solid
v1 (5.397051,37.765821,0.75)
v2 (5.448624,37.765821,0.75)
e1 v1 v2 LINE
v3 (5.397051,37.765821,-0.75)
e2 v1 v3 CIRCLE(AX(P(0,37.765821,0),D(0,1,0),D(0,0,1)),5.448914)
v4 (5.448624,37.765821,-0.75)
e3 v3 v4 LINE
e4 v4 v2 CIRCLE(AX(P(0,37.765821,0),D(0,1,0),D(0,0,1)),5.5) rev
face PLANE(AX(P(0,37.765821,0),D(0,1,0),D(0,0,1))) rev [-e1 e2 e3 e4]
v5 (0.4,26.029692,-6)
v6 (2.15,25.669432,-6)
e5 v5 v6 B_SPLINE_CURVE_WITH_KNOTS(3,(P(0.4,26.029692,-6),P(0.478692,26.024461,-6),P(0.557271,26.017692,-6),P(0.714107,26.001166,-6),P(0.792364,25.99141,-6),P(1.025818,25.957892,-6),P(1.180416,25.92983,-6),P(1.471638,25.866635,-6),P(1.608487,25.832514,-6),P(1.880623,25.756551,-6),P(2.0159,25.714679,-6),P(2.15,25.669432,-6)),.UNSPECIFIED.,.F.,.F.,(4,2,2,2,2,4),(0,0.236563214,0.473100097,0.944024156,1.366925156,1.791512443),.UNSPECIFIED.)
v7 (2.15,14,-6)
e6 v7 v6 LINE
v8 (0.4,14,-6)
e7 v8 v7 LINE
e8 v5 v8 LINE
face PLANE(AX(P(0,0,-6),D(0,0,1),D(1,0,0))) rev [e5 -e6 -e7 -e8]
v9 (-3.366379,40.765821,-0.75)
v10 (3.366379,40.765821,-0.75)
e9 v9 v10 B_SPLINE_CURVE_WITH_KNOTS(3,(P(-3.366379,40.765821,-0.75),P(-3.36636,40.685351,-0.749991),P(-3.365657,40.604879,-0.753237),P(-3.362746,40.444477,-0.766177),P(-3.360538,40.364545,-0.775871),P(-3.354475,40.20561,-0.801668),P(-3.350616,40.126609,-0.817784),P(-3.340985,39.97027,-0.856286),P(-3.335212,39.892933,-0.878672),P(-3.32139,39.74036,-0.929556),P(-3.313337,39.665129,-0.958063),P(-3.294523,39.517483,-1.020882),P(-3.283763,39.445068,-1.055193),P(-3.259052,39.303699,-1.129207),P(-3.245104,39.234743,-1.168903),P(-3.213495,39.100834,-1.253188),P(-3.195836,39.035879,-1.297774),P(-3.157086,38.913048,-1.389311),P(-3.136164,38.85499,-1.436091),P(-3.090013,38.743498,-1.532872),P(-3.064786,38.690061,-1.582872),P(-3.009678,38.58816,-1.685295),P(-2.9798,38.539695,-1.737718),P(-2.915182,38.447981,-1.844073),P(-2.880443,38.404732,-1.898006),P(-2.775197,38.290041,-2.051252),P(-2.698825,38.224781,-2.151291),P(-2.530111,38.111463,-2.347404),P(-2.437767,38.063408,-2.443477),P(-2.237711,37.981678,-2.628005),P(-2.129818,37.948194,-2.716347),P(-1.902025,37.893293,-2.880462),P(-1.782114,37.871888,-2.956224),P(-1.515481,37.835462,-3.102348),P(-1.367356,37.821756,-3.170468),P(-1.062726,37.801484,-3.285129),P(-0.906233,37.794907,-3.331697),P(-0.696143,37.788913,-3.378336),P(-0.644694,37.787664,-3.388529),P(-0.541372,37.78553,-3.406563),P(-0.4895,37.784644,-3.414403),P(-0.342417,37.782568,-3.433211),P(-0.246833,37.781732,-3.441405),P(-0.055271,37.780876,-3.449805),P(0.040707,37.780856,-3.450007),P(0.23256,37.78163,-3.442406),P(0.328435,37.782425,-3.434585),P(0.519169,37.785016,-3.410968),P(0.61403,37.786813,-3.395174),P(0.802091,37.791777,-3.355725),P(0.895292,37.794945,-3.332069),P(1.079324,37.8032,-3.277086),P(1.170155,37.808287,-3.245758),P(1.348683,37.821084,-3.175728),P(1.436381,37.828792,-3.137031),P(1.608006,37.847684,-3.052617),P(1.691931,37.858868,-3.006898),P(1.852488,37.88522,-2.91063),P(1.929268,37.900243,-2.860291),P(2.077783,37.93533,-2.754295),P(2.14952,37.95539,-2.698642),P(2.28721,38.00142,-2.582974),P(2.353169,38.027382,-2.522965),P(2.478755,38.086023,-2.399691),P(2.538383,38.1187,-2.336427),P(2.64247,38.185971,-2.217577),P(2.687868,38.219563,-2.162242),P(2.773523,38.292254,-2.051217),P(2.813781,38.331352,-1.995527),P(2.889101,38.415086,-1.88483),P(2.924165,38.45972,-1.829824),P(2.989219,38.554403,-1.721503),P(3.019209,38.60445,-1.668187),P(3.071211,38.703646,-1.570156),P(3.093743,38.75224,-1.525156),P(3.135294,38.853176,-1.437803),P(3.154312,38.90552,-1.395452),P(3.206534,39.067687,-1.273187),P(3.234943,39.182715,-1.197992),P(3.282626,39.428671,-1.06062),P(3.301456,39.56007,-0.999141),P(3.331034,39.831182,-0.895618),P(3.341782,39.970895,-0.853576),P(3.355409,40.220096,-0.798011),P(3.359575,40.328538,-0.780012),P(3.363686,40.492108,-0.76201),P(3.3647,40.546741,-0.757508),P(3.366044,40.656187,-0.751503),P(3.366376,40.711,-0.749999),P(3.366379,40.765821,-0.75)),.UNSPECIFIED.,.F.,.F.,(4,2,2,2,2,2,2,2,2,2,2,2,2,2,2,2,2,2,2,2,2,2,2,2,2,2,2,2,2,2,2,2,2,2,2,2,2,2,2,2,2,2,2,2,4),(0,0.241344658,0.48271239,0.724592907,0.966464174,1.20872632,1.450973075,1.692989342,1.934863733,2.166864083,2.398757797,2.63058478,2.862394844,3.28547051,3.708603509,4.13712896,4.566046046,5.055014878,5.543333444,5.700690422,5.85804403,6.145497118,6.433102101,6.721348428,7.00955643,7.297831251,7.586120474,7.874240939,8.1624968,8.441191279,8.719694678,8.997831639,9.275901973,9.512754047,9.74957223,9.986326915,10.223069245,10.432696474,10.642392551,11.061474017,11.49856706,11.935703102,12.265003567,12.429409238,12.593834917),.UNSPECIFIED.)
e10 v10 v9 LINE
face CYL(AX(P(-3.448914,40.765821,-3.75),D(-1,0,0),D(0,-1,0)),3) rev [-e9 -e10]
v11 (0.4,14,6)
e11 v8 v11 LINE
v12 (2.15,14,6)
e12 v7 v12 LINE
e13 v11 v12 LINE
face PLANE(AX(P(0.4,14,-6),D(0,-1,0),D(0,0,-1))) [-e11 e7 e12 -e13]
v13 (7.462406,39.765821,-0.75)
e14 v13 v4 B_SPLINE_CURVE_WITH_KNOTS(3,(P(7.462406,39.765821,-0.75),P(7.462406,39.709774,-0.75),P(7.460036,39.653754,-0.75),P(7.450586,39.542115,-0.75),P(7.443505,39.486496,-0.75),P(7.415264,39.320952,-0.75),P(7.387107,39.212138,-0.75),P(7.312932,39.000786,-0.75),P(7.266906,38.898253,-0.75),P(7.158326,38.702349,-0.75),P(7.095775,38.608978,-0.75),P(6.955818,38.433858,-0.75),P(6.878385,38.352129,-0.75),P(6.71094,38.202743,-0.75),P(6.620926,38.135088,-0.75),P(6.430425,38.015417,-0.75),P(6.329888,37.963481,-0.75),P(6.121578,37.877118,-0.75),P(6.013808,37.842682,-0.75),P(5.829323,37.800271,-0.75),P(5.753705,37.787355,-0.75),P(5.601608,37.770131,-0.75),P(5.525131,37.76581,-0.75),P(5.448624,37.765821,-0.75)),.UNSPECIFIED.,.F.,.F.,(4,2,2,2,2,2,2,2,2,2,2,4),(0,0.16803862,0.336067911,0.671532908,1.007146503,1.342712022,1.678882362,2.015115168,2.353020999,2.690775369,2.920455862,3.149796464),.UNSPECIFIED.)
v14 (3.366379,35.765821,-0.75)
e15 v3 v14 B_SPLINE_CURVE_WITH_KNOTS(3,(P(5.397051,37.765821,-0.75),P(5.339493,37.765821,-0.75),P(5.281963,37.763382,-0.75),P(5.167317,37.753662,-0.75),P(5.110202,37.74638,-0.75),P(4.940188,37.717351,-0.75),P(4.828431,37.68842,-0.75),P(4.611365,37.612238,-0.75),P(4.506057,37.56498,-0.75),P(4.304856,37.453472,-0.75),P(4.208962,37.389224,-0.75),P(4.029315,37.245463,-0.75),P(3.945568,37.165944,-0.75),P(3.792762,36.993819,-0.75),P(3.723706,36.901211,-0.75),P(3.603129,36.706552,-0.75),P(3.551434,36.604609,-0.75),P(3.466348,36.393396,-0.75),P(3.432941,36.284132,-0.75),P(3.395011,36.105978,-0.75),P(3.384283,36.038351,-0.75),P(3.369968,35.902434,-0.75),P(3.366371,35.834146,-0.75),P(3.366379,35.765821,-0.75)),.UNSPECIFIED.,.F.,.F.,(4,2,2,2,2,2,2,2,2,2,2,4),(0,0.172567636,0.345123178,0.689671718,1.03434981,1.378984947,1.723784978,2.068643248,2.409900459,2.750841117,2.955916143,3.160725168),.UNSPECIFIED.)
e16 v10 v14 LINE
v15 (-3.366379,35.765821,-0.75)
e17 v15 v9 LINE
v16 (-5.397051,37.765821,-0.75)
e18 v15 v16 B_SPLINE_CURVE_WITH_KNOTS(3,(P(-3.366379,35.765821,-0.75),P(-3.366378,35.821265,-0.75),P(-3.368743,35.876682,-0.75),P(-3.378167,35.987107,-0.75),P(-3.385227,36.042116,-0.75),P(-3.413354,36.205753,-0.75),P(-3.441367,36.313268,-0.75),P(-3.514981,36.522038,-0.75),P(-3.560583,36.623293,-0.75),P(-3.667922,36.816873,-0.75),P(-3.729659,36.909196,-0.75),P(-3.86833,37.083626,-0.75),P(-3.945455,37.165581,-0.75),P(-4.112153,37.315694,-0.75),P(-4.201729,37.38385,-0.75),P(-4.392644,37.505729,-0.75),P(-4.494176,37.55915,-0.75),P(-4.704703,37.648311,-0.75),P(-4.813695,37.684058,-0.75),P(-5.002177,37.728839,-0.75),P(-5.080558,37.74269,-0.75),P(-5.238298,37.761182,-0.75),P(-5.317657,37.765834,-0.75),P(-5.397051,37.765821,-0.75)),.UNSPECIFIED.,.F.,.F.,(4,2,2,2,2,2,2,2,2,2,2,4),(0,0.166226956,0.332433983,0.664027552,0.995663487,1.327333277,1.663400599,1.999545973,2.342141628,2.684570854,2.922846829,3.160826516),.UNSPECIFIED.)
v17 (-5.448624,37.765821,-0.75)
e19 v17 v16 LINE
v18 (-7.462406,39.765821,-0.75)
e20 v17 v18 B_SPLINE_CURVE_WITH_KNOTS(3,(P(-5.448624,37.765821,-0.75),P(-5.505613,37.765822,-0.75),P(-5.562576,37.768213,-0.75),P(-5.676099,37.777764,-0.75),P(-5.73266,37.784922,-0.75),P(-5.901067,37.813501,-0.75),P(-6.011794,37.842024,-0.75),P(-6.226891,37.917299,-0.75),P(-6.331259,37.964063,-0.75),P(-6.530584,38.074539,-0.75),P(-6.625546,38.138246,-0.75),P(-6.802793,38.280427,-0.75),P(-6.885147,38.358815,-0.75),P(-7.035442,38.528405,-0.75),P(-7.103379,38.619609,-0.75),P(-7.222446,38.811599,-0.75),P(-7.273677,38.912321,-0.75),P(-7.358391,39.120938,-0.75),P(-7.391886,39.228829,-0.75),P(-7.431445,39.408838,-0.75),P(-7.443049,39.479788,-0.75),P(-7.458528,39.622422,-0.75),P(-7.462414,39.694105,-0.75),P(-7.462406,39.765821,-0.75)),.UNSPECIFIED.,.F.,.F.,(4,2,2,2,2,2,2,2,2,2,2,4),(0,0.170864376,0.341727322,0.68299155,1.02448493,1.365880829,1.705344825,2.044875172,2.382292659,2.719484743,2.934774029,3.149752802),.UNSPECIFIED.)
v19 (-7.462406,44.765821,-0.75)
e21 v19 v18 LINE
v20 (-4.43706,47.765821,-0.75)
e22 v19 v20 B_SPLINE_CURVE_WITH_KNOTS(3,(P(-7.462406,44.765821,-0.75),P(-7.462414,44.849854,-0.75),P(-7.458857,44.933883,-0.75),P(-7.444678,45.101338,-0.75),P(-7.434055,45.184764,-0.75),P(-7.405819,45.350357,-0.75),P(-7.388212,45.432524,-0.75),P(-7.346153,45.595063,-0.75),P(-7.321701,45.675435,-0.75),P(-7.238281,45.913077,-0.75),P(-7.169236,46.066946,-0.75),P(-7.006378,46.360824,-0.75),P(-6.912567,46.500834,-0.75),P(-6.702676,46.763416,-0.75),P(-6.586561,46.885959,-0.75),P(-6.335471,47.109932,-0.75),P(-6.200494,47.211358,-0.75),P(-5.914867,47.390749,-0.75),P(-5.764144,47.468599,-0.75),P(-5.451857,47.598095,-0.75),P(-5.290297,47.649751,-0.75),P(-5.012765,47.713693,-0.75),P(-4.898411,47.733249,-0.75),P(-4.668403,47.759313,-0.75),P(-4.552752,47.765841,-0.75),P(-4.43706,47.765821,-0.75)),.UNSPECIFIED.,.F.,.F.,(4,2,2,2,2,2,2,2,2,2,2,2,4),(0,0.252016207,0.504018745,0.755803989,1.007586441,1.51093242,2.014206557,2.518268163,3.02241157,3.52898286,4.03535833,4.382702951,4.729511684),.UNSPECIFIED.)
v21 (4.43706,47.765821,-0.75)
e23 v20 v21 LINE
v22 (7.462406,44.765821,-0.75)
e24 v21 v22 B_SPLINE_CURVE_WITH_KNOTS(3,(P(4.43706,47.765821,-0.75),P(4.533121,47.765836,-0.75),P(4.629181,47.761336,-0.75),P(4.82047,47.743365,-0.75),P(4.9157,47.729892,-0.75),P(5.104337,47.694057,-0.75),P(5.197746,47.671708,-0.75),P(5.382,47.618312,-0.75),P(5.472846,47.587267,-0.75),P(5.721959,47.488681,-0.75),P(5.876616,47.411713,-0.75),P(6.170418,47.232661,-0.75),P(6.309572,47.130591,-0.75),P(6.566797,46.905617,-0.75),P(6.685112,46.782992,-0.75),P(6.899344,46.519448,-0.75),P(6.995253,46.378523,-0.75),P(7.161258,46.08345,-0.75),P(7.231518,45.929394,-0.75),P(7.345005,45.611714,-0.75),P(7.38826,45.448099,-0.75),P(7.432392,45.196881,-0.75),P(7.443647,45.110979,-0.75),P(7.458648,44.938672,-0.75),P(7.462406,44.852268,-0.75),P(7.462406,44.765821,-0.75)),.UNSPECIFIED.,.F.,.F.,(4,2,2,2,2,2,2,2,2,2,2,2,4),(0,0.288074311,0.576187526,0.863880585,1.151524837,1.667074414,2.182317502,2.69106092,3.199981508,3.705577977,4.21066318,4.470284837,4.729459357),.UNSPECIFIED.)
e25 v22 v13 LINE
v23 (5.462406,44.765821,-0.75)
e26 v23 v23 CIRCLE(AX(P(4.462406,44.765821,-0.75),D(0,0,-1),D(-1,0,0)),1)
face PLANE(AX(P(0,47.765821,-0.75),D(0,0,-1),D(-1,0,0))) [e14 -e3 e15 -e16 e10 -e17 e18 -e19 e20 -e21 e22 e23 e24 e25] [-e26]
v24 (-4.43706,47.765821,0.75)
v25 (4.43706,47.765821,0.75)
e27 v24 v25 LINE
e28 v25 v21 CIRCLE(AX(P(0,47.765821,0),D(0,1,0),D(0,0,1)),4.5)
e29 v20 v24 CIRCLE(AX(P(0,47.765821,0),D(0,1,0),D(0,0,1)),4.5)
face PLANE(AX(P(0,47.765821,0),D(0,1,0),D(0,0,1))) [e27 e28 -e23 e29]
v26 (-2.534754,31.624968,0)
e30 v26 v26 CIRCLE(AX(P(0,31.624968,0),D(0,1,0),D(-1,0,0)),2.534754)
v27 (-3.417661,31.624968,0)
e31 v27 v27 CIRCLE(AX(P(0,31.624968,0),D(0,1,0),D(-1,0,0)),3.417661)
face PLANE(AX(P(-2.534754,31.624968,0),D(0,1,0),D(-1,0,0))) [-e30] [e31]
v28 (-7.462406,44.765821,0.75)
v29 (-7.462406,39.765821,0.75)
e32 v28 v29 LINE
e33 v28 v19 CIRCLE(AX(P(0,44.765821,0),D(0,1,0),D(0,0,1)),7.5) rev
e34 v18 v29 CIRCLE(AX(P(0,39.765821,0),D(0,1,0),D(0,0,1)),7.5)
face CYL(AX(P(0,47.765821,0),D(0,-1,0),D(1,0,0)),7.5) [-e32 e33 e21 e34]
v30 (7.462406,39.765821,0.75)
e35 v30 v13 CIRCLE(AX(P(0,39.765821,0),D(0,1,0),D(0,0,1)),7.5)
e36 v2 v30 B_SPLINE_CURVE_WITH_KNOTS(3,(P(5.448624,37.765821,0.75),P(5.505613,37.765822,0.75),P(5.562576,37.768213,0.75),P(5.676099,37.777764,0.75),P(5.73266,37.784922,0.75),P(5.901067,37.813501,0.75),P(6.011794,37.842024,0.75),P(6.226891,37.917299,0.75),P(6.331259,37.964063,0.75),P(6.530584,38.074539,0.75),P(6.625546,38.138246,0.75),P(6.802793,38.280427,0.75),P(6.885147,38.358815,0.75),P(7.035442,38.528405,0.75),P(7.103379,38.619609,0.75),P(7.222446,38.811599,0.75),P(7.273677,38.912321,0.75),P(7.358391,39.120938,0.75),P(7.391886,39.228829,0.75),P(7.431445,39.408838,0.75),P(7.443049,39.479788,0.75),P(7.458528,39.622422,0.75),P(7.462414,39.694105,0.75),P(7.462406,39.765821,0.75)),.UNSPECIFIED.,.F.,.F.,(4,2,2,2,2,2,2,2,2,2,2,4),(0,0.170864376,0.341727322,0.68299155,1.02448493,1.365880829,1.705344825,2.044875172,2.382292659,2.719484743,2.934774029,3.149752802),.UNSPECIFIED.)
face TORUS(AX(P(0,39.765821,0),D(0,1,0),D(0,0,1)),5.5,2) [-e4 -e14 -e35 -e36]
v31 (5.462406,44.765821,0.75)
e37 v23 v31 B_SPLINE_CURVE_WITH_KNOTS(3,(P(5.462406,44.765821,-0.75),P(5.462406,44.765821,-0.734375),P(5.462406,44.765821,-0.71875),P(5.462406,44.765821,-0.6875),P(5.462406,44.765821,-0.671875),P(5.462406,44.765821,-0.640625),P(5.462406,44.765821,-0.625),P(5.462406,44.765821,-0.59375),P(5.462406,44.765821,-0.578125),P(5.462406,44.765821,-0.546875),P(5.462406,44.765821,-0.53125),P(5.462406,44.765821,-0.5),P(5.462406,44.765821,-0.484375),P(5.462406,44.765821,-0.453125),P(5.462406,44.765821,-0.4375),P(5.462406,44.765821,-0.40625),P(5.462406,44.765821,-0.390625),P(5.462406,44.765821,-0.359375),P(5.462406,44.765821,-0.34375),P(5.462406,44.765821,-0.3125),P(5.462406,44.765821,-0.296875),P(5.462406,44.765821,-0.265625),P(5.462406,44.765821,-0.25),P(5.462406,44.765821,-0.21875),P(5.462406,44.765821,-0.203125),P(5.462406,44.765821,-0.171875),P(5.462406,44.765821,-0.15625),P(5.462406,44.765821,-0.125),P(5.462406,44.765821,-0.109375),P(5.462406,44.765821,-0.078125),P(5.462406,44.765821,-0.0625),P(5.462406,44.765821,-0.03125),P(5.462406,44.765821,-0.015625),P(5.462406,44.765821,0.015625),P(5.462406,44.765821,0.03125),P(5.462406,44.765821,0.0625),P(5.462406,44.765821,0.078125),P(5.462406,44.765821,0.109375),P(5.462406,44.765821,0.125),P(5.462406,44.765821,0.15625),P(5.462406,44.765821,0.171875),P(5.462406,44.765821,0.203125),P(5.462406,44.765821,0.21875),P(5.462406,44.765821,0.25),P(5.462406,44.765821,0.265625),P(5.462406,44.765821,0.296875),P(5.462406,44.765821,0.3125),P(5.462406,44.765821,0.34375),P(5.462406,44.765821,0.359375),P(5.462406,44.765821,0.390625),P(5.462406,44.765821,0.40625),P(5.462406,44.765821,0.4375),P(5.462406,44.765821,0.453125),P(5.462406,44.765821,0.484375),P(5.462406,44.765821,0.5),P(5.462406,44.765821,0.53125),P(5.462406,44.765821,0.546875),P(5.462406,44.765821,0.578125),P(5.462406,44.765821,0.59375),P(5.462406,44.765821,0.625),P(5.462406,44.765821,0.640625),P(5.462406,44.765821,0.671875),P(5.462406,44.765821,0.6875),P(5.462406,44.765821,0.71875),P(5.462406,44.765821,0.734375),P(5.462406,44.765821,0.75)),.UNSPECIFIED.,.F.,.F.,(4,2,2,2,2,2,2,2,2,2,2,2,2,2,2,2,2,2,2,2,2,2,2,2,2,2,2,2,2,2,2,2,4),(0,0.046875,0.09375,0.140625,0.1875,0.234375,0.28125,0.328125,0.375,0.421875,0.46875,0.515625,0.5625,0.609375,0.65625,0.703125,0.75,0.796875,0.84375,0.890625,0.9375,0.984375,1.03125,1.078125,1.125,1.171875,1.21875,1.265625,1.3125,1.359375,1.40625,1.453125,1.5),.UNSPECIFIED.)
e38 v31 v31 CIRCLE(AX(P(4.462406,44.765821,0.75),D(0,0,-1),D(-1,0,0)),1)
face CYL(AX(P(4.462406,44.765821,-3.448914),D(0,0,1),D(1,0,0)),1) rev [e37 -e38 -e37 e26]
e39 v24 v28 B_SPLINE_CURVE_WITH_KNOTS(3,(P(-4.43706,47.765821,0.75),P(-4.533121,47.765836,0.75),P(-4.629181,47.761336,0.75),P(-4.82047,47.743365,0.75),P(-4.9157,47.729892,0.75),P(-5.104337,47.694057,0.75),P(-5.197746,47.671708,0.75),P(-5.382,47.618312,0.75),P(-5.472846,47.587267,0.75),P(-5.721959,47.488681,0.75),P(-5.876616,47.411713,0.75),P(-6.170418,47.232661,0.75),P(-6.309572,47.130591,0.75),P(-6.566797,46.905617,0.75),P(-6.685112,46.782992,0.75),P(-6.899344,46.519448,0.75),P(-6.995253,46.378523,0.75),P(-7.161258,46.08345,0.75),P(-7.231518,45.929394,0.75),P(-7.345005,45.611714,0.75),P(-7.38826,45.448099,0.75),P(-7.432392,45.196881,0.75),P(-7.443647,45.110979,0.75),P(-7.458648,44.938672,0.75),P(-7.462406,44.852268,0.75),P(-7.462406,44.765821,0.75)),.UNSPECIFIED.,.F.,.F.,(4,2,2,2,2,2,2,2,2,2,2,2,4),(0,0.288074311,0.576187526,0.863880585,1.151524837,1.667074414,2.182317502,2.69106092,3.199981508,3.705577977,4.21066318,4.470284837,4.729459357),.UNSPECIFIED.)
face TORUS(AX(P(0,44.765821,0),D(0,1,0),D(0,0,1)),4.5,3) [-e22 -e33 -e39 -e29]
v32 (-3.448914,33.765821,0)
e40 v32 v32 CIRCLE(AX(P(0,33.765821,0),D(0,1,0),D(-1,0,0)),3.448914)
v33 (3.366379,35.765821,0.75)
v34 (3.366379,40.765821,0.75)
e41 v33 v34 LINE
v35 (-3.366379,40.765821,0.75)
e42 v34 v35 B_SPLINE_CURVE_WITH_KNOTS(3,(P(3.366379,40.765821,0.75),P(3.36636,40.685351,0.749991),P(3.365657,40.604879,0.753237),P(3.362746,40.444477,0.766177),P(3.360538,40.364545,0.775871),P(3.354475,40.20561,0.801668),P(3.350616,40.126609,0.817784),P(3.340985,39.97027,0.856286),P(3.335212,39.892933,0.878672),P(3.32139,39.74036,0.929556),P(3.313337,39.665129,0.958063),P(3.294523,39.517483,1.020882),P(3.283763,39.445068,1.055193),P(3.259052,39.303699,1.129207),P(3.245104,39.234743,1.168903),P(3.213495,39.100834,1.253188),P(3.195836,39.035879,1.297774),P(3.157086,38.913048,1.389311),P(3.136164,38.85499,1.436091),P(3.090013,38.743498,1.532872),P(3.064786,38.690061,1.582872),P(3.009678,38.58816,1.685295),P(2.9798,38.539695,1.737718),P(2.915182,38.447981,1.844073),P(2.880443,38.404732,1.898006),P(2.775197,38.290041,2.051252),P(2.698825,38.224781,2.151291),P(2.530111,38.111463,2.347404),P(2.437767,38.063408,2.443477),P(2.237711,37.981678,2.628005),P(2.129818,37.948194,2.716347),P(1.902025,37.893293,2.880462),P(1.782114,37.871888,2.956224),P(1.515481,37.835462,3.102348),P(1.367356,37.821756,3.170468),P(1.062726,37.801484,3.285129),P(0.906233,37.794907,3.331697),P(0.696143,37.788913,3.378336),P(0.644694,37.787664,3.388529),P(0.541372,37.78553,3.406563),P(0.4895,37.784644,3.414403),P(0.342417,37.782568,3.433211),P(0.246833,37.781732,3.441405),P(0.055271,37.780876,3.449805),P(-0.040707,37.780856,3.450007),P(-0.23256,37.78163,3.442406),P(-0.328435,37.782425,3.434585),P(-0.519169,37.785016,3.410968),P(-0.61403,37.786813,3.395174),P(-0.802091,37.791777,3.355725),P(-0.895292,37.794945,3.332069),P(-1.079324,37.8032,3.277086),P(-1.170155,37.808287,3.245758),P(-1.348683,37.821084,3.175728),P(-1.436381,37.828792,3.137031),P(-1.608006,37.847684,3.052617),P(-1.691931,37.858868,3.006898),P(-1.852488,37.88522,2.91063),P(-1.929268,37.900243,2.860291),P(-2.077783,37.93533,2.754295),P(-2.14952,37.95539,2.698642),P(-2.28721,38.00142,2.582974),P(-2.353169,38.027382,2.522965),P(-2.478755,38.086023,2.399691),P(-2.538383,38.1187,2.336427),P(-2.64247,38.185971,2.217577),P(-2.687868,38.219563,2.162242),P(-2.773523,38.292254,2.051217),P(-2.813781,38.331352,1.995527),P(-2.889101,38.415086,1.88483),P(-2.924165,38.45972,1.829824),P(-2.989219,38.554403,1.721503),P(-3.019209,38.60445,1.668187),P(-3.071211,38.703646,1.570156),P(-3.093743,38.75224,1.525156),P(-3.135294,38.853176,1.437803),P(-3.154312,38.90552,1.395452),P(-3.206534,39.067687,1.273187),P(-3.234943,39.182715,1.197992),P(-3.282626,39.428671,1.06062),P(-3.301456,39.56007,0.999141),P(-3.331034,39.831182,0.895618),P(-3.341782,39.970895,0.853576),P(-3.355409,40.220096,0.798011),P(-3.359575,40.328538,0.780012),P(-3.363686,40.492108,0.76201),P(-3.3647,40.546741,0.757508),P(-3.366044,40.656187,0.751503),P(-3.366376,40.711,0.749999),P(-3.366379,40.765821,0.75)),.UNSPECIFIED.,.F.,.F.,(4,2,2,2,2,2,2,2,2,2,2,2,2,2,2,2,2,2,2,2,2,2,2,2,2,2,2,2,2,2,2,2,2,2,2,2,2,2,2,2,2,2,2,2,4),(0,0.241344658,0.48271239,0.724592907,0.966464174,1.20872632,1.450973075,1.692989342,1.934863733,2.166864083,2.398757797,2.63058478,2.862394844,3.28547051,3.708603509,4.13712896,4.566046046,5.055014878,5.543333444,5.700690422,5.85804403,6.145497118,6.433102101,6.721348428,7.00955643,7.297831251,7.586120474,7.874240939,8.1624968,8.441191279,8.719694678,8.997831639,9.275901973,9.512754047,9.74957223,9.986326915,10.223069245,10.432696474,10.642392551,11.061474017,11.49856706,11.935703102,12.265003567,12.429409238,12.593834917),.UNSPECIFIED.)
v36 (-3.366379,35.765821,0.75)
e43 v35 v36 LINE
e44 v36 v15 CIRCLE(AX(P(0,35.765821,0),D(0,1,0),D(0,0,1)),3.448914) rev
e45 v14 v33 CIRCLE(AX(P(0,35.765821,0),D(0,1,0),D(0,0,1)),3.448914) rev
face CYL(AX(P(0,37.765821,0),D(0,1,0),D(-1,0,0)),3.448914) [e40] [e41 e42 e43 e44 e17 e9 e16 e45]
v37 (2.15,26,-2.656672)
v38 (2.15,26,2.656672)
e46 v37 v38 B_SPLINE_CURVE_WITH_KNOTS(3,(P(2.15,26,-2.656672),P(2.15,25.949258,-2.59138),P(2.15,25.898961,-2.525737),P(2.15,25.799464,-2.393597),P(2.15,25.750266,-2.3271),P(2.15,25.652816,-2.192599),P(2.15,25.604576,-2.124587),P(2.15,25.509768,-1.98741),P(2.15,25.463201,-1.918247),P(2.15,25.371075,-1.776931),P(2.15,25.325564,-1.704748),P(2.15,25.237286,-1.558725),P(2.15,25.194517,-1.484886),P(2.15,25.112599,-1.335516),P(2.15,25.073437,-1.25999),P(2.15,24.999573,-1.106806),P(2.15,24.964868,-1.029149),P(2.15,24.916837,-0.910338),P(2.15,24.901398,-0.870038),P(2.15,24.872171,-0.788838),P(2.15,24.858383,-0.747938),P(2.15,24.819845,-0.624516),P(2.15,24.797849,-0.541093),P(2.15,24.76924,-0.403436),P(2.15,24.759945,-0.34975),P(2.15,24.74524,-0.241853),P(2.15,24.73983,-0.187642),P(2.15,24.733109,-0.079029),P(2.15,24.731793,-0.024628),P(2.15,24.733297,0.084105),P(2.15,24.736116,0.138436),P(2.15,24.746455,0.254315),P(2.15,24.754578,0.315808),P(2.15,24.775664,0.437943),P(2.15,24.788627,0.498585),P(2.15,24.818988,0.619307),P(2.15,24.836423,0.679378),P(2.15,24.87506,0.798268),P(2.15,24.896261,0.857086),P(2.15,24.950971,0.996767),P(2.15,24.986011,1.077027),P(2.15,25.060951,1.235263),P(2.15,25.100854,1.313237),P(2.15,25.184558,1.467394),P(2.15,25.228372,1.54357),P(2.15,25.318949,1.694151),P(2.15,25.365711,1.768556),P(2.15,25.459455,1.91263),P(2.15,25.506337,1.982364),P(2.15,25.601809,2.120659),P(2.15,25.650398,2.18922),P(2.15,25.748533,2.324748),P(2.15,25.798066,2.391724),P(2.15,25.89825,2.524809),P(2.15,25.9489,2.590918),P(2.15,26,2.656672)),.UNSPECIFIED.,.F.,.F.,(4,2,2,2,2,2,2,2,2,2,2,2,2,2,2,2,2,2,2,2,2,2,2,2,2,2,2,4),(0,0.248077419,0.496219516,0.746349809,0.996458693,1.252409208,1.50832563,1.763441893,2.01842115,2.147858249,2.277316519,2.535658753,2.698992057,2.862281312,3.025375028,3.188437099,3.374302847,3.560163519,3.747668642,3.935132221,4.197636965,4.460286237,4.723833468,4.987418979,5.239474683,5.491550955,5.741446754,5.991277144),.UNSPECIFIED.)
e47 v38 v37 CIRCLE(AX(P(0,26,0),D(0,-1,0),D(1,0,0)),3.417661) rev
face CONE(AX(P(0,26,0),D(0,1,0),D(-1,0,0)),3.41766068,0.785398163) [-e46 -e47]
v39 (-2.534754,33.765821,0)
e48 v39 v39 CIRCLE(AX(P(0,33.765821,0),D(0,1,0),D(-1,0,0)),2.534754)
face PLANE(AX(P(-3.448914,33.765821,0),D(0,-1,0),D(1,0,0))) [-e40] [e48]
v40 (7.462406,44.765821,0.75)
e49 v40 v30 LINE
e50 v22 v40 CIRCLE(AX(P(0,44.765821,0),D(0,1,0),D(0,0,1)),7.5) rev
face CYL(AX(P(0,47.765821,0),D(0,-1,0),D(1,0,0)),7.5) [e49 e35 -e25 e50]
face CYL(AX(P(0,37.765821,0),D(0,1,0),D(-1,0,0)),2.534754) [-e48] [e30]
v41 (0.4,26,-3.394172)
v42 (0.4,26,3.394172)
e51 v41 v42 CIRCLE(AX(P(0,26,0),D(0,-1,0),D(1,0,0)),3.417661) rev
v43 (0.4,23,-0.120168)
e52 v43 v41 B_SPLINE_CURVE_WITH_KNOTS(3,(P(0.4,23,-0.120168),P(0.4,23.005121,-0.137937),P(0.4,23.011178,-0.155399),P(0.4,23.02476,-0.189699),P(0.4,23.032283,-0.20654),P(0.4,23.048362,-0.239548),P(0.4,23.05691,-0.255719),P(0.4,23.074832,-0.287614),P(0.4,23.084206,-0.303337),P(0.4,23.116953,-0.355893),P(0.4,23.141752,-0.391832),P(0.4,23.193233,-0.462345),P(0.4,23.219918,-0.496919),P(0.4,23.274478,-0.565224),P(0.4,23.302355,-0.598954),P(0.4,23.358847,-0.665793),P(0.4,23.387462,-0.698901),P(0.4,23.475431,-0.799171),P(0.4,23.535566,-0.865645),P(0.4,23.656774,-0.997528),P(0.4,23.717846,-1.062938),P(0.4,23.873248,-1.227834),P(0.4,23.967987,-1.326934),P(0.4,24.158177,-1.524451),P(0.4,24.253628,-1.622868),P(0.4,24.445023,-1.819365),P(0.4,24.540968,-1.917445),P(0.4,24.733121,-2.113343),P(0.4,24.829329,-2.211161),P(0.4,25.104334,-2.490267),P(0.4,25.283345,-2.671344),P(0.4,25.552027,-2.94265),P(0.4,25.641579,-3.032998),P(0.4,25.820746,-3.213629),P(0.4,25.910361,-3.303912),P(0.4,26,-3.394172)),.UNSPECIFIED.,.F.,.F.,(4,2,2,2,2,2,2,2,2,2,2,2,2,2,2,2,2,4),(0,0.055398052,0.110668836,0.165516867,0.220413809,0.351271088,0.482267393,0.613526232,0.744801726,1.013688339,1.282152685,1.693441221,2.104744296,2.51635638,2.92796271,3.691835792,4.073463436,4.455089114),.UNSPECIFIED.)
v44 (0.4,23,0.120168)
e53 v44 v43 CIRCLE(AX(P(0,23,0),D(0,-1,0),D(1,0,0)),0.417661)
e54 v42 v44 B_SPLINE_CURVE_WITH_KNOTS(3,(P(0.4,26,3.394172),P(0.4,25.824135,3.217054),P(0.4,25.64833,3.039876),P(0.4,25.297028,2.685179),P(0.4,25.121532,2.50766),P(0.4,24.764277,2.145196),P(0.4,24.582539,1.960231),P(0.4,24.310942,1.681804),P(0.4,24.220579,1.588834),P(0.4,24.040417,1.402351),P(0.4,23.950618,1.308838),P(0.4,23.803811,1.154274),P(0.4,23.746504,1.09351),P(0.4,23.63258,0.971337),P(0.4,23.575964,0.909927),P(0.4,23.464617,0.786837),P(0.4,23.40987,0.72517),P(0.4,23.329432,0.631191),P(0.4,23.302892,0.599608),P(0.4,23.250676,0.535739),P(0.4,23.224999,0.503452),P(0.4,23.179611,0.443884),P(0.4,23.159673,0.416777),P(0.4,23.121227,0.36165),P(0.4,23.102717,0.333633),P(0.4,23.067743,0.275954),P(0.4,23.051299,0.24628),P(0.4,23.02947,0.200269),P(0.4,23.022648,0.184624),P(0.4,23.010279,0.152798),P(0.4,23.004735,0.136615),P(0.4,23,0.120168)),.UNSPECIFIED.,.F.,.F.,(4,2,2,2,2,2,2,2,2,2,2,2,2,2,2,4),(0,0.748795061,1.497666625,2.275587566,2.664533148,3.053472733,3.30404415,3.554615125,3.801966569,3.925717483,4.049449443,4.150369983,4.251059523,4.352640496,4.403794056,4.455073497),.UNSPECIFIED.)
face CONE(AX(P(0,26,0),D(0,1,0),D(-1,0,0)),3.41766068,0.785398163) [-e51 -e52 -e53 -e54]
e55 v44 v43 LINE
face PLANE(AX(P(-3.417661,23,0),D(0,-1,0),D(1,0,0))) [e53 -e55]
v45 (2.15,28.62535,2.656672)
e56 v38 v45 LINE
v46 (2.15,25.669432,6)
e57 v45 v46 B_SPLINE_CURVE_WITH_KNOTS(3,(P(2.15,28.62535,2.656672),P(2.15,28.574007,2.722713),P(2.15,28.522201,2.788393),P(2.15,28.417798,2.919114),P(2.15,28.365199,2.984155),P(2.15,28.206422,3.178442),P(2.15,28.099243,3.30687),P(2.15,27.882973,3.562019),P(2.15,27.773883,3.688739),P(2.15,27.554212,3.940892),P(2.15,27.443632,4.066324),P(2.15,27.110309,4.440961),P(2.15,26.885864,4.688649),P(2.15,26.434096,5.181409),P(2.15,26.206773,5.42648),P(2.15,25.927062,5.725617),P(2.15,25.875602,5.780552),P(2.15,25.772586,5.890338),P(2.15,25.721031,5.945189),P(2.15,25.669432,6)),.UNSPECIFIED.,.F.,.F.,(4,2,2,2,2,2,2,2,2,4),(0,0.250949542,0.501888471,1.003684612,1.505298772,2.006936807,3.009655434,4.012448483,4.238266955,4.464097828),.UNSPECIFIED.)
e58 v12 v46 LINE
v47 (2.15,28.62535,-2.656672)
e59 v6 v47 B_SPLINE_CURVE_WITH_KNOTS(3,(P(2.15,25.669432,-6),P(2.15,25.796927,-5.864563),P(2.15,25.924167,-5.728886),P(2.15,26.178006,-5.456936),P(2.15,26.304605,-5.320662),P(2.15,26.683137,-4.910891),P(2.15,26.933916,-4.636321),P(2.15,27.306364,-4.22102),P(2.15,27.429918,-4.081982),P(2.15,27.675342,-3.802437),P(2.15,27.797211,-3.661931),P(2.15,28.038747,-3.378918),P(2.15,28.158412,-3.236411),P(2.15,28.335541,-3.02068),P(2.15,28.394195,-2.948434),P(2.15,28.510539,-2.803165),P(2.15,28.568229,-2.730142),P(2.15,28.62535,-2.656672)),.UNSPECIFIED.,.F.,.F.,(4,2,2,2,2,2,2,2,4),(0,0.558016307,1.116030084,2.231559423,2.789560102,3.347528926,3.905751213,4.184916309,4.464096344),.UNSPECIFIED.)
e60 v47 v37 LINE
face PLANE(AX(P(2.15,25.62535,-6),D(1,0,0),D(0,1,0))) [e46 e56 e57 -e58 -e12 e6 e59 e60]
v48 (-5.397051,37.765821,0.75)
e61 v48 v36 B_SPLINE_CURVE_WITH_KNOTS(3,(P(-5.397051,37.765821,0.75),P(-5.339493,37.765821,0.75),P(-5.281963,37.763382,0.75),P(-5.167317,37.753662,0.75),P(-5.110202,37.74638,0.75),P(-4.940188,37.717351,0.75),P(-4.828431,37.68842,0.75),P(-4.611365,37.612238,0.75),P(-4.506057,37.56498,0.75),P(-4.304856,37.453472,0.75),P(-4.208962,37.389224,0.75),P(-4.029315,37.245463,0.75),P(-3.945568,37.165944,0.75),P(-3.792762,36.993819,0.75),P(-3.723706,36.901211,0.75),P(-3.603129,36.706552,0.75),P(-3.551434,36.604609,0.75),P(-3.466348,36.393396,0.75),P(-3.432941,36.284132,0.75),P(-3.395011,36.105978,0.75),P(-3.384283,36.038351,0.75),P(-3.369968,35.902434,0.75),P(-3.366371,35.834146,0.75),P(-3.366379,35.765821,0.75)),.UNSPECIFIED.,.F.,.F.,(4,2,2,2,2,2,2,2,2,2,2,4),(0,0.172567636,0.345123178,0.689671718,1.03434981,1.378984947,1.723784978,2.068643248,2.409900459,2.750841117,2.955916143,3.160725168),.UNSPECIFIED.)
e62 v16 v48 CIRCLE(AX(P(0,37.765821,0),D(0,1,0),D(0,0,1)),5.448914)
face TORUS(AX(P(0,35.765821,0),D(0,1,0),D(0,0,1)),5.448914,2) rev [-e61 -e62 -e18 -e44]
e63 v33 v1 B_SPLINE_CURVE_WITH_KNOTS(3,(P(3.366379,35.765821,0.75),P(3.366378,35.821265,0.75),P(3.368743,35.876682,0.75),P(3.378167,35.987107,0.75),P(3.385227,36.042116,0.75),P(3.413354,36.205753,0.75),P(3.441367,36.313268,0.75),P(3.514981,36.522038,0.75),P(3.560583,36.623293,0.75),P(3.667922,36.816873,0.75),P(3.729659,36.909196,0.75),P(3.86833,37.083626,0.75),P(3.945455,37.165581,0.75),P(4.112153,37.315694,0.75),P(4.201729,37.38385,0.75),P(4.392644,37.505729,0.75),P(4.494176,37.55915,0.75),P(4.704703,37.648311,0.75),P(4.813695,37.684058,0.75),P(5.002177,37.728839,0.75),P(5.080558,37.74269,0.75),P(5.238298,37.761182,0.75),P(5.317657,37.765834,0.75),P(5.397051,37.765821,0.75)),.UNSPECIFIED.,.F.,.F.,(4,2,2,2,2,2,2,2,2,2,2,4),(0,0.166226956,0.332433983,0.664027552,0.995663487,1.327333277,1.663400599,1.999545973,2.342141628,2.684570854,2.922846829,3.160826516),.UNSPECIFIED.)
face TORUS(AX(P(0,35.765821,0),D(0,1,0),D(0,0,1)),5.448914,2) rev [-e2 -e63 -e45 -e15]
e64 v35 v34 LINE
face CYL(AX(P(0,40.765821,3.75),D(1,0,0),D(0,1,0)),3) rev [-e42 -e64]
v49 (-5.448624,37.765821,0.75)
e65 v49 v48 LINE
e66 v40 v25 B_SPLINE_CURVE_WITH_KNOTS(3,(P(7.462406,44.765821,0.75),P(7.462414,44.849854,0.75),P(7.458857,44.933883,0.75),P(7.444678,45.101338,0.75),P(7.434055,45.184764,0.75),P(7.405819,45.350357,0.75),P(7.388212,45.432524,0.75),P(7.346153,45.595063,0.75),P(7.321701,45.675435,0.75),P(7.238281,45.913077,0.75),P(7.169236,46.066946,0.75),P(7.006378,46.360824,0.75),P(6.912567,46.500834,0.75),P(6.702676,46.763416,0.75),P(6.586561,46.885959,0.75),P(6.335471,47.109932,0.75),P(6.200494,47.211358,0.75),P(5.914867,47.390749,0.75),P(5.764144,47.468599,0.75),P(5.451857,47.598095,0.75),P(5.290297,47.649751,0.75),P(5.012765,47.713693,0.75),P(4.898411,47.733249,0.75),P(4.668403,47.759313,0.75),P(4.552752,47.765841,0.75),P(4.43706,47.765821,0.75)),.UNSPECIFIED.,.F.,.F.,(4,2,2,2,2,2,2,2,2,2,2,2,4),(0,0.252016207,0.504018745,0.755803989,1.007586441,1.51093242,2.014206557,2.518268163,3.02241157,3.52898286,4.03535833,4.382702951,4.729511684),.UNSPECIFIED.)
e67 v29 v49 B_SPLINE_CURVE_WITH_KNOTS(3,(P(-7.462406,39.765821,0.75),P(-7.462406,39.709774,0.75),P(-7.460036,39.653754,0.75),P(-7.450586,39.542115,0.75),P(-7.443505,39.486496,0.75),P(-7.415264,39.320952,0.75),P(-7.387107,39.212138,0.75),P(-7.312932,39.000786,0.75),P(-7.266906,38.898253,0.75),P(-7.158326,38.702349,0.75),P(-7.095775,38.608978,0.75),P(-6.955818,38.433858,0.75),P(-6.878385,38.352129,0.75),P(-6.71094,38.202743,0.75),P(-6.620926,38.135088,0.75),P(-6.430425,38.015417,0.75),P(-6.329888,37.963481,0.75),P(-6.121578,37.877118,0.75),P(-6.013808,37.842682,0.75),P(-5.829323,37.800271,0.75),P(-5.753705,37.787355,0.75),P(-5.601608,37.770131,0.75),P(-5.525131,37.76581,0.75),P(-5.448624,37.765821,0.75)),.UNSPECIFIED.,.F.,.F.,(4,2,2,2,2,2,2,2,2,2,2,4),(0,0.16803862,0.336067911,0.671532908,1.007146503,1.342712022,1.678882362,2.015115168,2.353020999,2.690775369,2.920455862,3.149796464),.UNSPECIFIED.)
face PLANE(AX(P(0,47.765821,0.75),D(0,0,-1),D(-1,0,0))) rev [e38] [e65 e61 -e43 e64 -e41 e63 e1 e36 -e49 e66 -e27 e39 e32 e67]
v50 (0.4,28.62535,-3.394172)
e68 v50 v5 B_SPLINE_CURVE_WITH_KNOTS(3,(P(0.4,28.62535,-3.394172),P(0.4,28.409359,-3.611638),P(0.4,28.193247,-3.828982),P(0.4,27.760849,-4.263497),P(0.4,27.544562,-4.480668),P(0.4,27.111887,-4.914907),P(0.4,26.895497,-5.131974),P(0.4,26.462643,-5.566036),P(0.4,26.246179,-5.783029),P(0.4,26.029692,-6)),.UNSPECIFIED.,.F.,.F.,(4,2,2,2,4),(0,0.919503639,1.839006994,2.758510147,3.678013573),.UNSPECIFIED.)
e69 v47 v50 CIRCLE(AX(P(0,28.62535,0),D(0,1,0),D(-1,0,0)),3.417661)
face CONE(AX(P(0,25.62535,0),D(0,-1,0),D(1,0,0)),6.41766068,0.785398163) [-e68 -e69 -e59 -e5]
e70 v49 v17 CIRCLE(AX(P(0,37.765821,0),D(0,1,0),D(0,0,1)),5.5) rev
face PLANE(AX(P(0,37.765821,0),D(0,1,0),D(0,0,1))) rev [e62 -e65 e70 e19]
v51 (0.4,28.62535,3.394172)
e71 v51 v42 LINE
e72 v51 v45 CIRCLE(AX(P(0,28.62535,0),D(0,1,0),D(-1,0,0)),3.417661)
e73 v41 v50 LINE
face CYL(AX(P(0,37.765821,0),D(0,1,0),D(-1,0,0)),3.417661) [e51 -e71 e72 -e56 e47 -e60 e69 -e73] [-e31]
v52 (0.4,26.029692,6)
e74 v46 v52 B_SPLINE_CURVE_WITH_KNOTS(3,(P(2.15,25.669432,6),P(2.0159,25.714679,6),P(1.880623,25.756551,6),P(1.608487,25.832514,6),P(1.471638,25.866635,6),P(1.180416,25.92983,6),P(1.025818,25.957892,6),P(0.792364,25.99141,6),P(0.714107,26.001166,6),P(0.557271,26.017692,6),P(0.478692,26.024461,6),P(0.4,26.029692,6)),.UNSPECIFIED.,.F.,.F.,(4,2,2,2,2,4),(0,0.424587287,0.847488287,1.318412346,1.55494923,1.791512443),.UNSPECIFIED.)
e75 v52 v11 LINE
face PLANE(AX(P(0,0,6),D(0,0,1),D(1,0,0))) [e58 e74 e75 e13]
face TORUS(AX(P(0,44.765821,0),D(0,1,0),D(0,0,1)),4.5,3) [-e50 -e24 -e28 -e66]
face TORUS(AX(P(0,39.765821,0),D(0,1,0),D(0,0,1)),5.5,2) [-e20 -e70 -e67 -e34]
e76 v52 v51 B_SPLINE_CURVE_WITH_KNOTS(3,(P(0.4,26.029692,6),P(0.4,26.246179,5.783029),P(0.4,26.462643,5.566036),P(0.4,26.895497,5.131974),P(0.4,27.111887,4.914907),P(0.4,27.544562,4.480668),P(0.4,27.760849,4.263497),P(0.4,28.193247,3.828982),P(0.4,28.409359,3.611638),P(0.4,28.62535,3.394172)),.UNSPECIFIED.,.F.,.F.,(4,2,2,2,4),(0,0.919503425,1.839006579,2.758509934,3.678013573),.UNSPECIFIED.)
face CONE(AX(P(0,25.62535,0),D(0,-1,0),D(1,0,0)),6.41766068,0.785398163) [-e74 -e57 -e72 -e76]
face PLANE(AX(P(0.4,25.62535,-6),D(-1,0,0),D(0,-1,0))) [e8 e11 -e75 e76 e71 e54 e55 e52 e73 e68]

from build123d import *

# Parameters (mm, degrees)
BOSS_EXTRUDE1_DEPTH      = 10
FILLET2_R                = 2
FILLET3_R                = 3
CUT_EXTRUDE1_DEPTH       = 49.473897211
CUT_EXTRUDE1_DEPTH_BACK  = 49.473897211
SKETCH3_R                = 1
BOSS_EXTRUDE2_DEPTH      = 6
BOSS_EXTRUDE2_DEPTH_BACK = 6
SKETCH4_W                = 1.75
SKETCH4_H                = 11.625349657
CHAMFER1_SIZE            = 3
CHAMFER2_SIZE            = 3


with BuildPart() as part:
    # Sketch1 → Revolve1 (revolve)
    with BuildSketch(Plane.XY):
        Polygon((-3.448914015, 37.765821371), (-3.448914015, 33.765821371), (-2.534753992, 33.765821371), (-2.534753992, 31.624967984), (-3.41766068, 31.624967984), (-3.41766068, 23), (0, 23), (0, 37.765821371), align=None)
    revolve(axis=Axis((0, 37.765821371, 0), (0, -1, 0)))

    # Sketch2 → Boss-Extrude1 (add)
    with BuildSketch(Plane(origin=(0, 37.765821371, 0), x_dir=(1, 0, 0), z_dir=(0, 1, 0))):
        with BuildLine():
            Line((3.366379046, 0.75), (-3.366379046, 0.75))
            ThreePointArc((-3.366379046, 0.75), (-3.448914015, 0), (-3.366379046, -0.75))
            Line((-3.366379046, -0.75), (3.366379046, -0.75))
            ThreePointArc((3.366379046, -0.75), (3.428218178, -0.37726384), (3.448914015, 0))
            ThreePointArc((3.448914015, 0), (3.428218178, 0.37726384), (3.366379046, 0.75))
        make_face()
        with BuildLine():
            Line((-3.366379046, 0.75), (-7.462405778, 0.75))
            ThreePointArc((-7.462405778, 0.75), (-7.5, 0), (-7.462405778, -0.75))
            Line((-7.462405778, -0.75), (-3.366379046, -0.75))
            ThreePointArc((-3.366379046, -0.75), (-3.448914015, 0), (-3.366379046, 0.75))
        make_face()
        with BuildLine():
            ThreePointArc((7.5, 0), (7.490595548, 0.375470813), (7.462405778, 0.75))
            Line((7.462405778, 0.75), (3.366379046, 0.75))
            ThreePointArc((3.366379046, 0.75), (3.428218178, 0.37726384), (3.448914015, 0))
            ThreePointArc((3.448914015, 0), (3.428218178, -0.37726384), (3.366379046, -0.75))
            Line((3.366379046, -0.75), (7.462405778, -0.75))
            ThreePointArc((7.462405778, -0.75), (7.490595548, -0.375470813), (7.5, 0))
        make_face()
    extrude(amount=BOSS_EXTRUDE1_DEPTH)

    # Fillet2
    # the kernel refuses this fillet: 2 mm, written as the material it adds along each edge
    with BuildSketch(Plane(origin=(0, 37.765821371, 0), x_dir=(-0.09803421101524086, 0, -0.9951830452085783), z_dir=(-0.9951830452085783, 0, 0.09803421101524086))) as fillet2_piece_1_section:
        with BuildLine():
            CenterArc((3.448914015 + FILLET2_R, FILLET2_R), FILLET2_R, 180, 90)
            Line((3.448914015 + FILLET2_R, 0), (3.448914015, 0))
            Line((3.448914015, 0), (3.448914015, FILLET2_R))
        make_face()
    fillet2_piece_1 = revolve(axis=Axis((0, 37.765821371, 0), (0, -1, 0)), revolution_arc=191.251965623, mode=Mode.PRIVATE)
    fillet2_piece_1 = split(fillet2_piece_1, bisect_by=Plane(origin=(3.870689991, 37.318827735, -0.75), z_dir=(0, 0, 1)), keep=Keep.TOP, mode=Mode.PRIVATE)
    fillet2_piece_1 = split(fillet2_piece_1, bisect_by=Plane(origin=(3.870689991, 37.318827735, 0.75), z_dir=(0, 0, -1)), keep=Keep.TOP, mode=Mode.PRIVATE)
    add(fillet2_piece_1)
    with BuildSketch(Plane(origin=(0, 37.765821371, 0), x_dir=(0.09800035789508027, 0, 0.9951863794548418), z_dir=(0.9951863794548418, 0, -0.09800035789508027))) as fillet2_piece_2_section:
        with BuildLine():
            CenterArc((3.448914015 + FILLET2_R, FILLET2_R), FILLET2_R, 180, 90)
            Line((3.448914015 + FILLET2_R, 0), (3.448914015, 0))
            Line((3.448914015, 0), (3.448914015, FILLET2_R))
        make_face()
    fillet2_piece_2 = revolve(axis=Axis((0, 37.765821371, 0), (0, -1, 0)), revolution_arc=95.624033786, mode=Mode.PRIVATE)
    fillet2_piece_2 = split(fillet2_piece_2, bisect_by=Plane(origin=(-3.870690025, 37.318827894, 0.75), z_dir=(0, 0, -1)), keep=Keep.TOP, mode=Mode.PRIVATE)
    add(fillet2_piece_2)
    with BuildSketch(Plane(origin=(0, 37.765821371, 0), x_dir=(-1, 0, 0), z_dir=(0, 0, 1))) as fillet2_piece_3_section:
        with BuildLine():
            CenterArc((3.448914015 + FILLET2_R, FILLET2_R), FILLET2_R, 180, 90)
            Line((3.448914015 + FILLET2_R, 0), (3.448914015, 0))
            Line((3.448914015, 0), (3.448914015, FILLET2_R))
        make_face()
    fillet2_piece_3 = revolve(axis=Axis((0, 37.765821371, 0), (0, -1, 0)), revolution_arc=95.624033786, mode=Mode.PRIVATE)
    fillet2_piece_3 = split(fillet2_piece_3, bisect_by=Plane(origin=(-3.870689874, 37.318828004, -0.75), z_dir=(0, 0, 1)), keep=Keep.TOP, mode=Mode.PRIVATE)
    add(fillet2_piece_3)
    # the kernel refuses this fillet: 2 mm, written as the material it takes off along each edge
    with BuildSketch(Plane(origin=(0, 37.765821371, 0), x_dir=(-0.7201079494948177, 0, -0.6938620475817721), z_dir=(0.6938620475817721, 0, -0.7201079494948177))) as fillet2_2_piece_1:
        with BuildLine():
            CenterArc((7.5 - FILLET2_R, FILLET2_R), FILLET2_R, 270, 90)
            Line((7.5, FILLET2_R), (7.5, 0))
            Line((7.5, 0), (7.5 - FILLET2_R, 0))
        make_face()
    revolve(axis=Axis((0, 37.765821371, 0), (0, 1, 0)), revolution_arc=87.873212667, mode=Mode.SUBTRACT)
    with BuildSketch(Plane(origin=(0, 37.765821371, 0), x_dir=(0.7201079494948216, 0, 0.6938620475817678), z_dir=(-0.6938620475817678, 0, 0.7201079494948216))) as fillet2_2_piece_2:
        with BuildLine():
            CenterArc((7.5 - FILLET2_R, FILLET2_R), FILLET2_R, 270, 90)
            Line((7.5 - FILLET2_R, 0), (7.5, 0))
            Line((7.5, 0), (7.5, FILLET2_R))
        make_face()
    revolve(axis=Axis((0, 37.765821371, 0), (0, 1, 0)), revolution_arc=87.873212667, mode=Mode.SUBTRACT)

    # Fillet3
    # the kernel refuses this fillet: 3 mm, written as the material it adds along each edge
    with BuildSketch(Plane(origin=(10.866379046, 37.765821371, -0.75), x_dir=(0, 1, 0), z_dir=(-1, 0, 0))) as fillet3_piece_1_section:
        with BuildLine():
            CenterArc((FILLET3_R, FILLET3_R), FILLET3_R, 180, 90)
            Line((0, FILLET3_R), (0, 0))
            Line((0, 0), (FILLET3_R, 0))
        make_face()
    fillet3_piece_1 = extrude(amount=21.732758092, mode=Mode.PRIVATE)
    fillet3_piece_1 = fillet3_piece_1 & Plane(origin=(0, 38.470226203, 0), x_dir=(-1, 0, 0), z_dir=(0, -1, 0)) * Cylinder(3.448914015, 56, mode=Mode.PRIVATE)
    add(fillet3_piece_1)
    with BuildSketch(Plane(origin=(10.866379046, 37.765821371, 0.75), x_dir=(0, 1, 0), z_dir=(-1, 0, 0))) as fillet3_piece_2_section:
        with BuildLine():
            CenterArc((FILLET3_R, -FILLET3_R), FILLET3_R, 90, 90)
            Line((0, -FILLET3_R), (0, 0))
            Line((0, 0), (FILLET3_R, 0))
        make_face()
    fillet3_piece_2 = extrude(amount=21.732758092, mode=Mode.PRIVATE)
    fillet3_piece_2 = fillet3_piece_2 & Plane(origin=(0, 38.470226203, 0), x_dir=(-1, 0, 0), z_dir=(0, -1, 0)) * Cylinder(3.448914015, 56, mode=Mode.PRIVATE)
    add(fillet3_piece_2)
    # the kernel refuses this fillet: 3 mm, written as the material it takes off along each edge
    with BuildSketch(Plane(origin=(0, 47.765821371, 0), x_dir=(-0.4534410859899706, 0, -0.8912862511764871), z_dir=(0.8912862511764871, 0, -0.4534410859899706))) as fillet3_2_piece_1:
        with BuildLine():
            CenterArc((7.5 - FILLET3_R, -FILLET3_R), FILLET3_R, 0, 90)
            Line((7.5 - FILLET3_R, 0), (7.5, 0))
            Line((7.5, 0), (7.5, -FILLET3_R))
        make_face()
    revolve(axis=Axis((0, 47.765821371, 0), (0, 1, 0)), revolution_arc=126.070648523, mode=Mode.SUBTRACT)
    with BuildSketch(Plane(origin=(0, 47.765821371, 0), x_dir=(0.4534410859901425, 0, -0.8912862511763997), z_dir=(-0.8912862511763997, 0, -0.4534410859901425))) as fillet3_2_piece_2:
        with BuildLine():
            CenterArc((7.5 - FILLET3_R, FILLET3_R), FILLET3_R, 270, 90)
            Line((7.5, FILLET3_R), (7.5, 0))
            Line((7.5, 0), (7.5 - FILLET3_R, 0))
        make_face()
    revolve(axis=Axis((0, 47.765821371, 0), (0, -1, 0)), revolution_arc=126.070648523, mode=Mode.SUBTRACT)

    # Sketch3 → Cut-Extrude1 (cut, two sides: drawn at the far end of the back side and taken through both)
    with BuildSketch(Plane.XY.offset(-CUT_EXTRUDE1_DEPTH_BACK)):
        with Locations((4.462405778, 44.765821371)):
            Circle(SKETCH3_R)
    extrude(amount=CUT_EXTRUDE1_DEPTH + CUT_EXTRUDE1_DEPTH_BACK, mode=Mode.SUBTRACT)

    # Sketch4 → Boss-Extrude2 (add, two sides: drawn at the far end of the back side and taken through both)
    with BuildSketch(Plane.XY.offset(-BOSS_EXTRUDE2_DEPTH_BACK)):
        with Locations((1.275, 19.812674829)):
            Rectangle(SKETCH4_W, SKETCH4_H)
    extrude(amount=BOSS_EXTRUDE2_DEPTH + BOSS_EXTRUDE2_DEPTH_BACK)

    # Chamfer1
    # the kernel refuses this chamfer: 3 mm, written as the material it adds along each edge
    with BuildSketch(Plane(origin=(0, 25.625349657, 0), x_dir=(0.20228823053710607, 0, -0.9793260293621153), z_dir=(-0.9793260293621153, 0, -0.20228823053710607))) as chamfer1_piece_1_section:
        Polygon((3.41766068, -CHAMFER1_SIZE), (3.41766068 + CHAMFER1_SIZE, 0), (3.41766068, 0), align=None)
    chamfer1_piece_1 = revolve(axis=Axis((0, 25.625349657, 0), (0, -1, 0)), revolution_arc=290.954478768, mode=Mode.PRIVATE)
    chamfer1_piece_1 = split(chamfer1_piece_1, bisect_by=Plane(origin=(0.4, 26.674438402, -4.015172559), z_dir=(1, 0, 0)), keep=Keep.TOP, mode=Mode.PRIVATE)
    chamfer1_piece_1 = split(chamfer1_piece_1, bisect_by=Plane(origin=(2.15, 26.674438402, -4.015172559), z_dir=(-1, 0, 0)), keep=Keep.TOP, mode=Mode.PRIVATE)
    chamfer1_piece_1 = split(chamfer1_piece_1, bisect_by=Plane(origin=(1.527141466, 26.674438402, -6), z_dir=(0, 0, 1)), keep=Keep.TOP, mode=Mode.PRIVATE)
    chamfer1_piece_1 = split(chamfer1_piece_1, bisect_by=Plane(origin=(1.527141466, 26.674438402, 6), z_dir=(0, 0, -1)), keep=Keep.TOP, mode=Mode.PRIVATE)
    add(chamfer1_piece_1)
    with BuildSketch(Plane(origin=(0, 25.625349657, 0), x_dir=(-0.8422146057104749, 0, 0.5391424282394677), z_dir=(0.5391424282394677, 0, 0.8422146057104749))) as chamfer1_piece_2_section:
        Polygon((3.41766068, -CHAMFER1_SIZE), (3.41766068 + CHAMFER1_SIZE, 0), (3.41766068, 0), align=None)
    chamfer1_piece_2 = revolve(axis=Axis((0, 25.625349657, 0), (0, -1, 0)), revolution_arc=290.954478768, mode=Mode.PRIVATE)
    chamfer1_piece_2 = split(chamfer1_piece_2, bisect_by=Plane(origin=(0.4, 26.639588442, -4.151887782), z_dir=(1, 0, 0)), keep=Keep.TOP, mode=Mode.PRIVATE)
    chamfer1_piece_2 = split(chamfer1_piece_2, bisect_by=Plane(origin=(2.15, 26.639588442, -4.151887782), z_dir=(-1, 0, 0)), keep=Keep.TOP, mode=Mode.PRIVATE)
    chamfer1_piece_2 = split(chamfer1_piece_2, bisect_by=Plane(origin=(1.298873136, 26.639588442, -6), z_dir=(0, 0, 1)), keep=Keep.TOP, mode=Mode.PRIVATE)
    chamfer1_piece_2 = split(chamfer1_piece_2, bisect_by=Plane(origin=(1.298873136, 26.639588442, 6), z_dir=(0, 0, -1)), keep=Keep.TOP, mode=Mode.PRIVATE)
    add(chamfer1_piece_2)

    # Chamfer2
    # the kernel refuses this chamfer: 3 mm, written as the material it takes off along each edge
    with BuildSketch(Plane(origin=(0, 23, 0), x_dir=(-0.9999950652018582, 0, -0.003141587485879368), z_dir=(-0.003141587485879368, 0, 0.9999950652018582))) as chamfer2_piece_1_section:
        Polygon((3.41766068 - CHAMFER2_SIZE, 0), (3.41766068, -CHAMFER2_SIZE), (3.41766068, 0), align=None)
    chamfer2_piece_1 = revolve(axis=Axis((0, 23, 0), (0, -1, 0)), revolution_arc=359.64, mode=Mode.PRIVATE)
    chamfer2_piece_1 = split(chamfer2_piece_1, bisect_by=Plane(origin=(0.4, 23.418910756, -0.767888946), z_dir=(-1, 0, 0)), keep=Keep.TOP, mode=Mode.PRIVATE)
    add(chamfer2_piece_1, mode=Mode.SUBTRACT)
    with BuildSketch(Plane(origin=(0, 23, 0), x_dir=(-0.9999950652018582, 0, -0.003141587485879368), z_dir=(-0.003141587485879368, 0, 0.9999950652018582))) as chamfer2_piece_2_section:
        Polygon((3.41766068 - CHAMFER2_SIZE, 0), (3.41766068, -CHAMFER2_SIZE), (3.41766068, 0), align=None)
    chamfer2_piece_2 = revolve(axis=Axis((0, 23, 0), (0, -1, 0)), revolution_arc=359.64, mode=Mode.PRIVATE)
    chamfer2_piece_2 = split(chamfer2_piece_2, bisect_by=Plane(origin=(2.15, 24.31046368, -3e-09), z_dir=(1, 0, 0)), keep=Keep.TOP, mode=Mode.PRIVATE)
    add(chamfer2_piece_2, mode=Mode.SUBTRACT)
    with BuildSketch(Plane(origin=(0, 23, 0), x_dir=(-1, 0, 0), z_dir=(0, 0, 1))) as chamfer2_piece_3_section:
        Polygon((3.41766068, -CHAMFER2_SIZE), (3.41766068 - CHAMFER2_SIZE, 0), (3.41766068, 0), align=None)
    chamfer2_piece_3 = revolve(axis=Axis((0, 23, 0), (0, -1, 0)), revolution_arc=226.121119214, mode=Mode.PRIVATE)
    chamfer2_piece_3 = split(chamfer2_piece_3, bisect_by=Plane(origin=(0.4, 24.102417014, -1.763188428), z_dir=(-1, 0, 0)), keep=Keep.TOP, mode=Mode.PRIVATE)
    add(chamfer2_piece_3, mode=Mode.SUBTRACT)
    with BuildSketch(Plane(origin=(0, 23, 0), x_dir=(-1, 0, 0), z_dir=(0, 0, 1))) as chamfer2_piece_4_section:
        Polygon((3.41766068, -CHAMFER2_SIZE), (3.41766068 - CHAMFER2_SIZE, 0), (3.41766068, 0), align=None)
    chamfer2_piece_4 = revolve(axis=Axis((0, 23, 0), (0, -1, 0)), revolution_arc=226.121119214, mode=Mode.PRIVATE)
    chamfer2_piece_4 = split(chamfer2_piece_4, bisect_by=Plane(origin=(2.15, 24.306348472, -0.040273497), z_dir=(1, 0, 0)), keep=Keep.TOP, mode=Mode.PRIVATE)
    add(chamfer2_piece_4, mode=Mode.SUBTRACT)
    with BuildSketch(Plane(origin=(0, 23, 0), x_dir=(0.6931361861639339, 0, -0.7208066505174022), z_dir=(-0.7208066505174022, 0, -0.6931361861639339))) as chamfer2_piece_5_section:
        Polygon((3.41766068, -CHAMFER2_SIZE), (3.41766068 - CHAMFER2_SIZE, 0), (3.41766068, 0), align=None)
    chamfer2_piece_5 = revolve(axis=Axis((0, 23, 0), (0, -1, 0)), revolution_arc=226.121119214, mode=Mode.PRIVATE)
    chamfer2_piece_5 = split(chamfer2_piece_5, bisect_by=Plane(origin=(2.15, 24.306348462, 0.040273494), z_dir=(1, 0, 0)), keep=Keep.TOP, mode=Mode.PRIVATE)
    add(chamfer2_piece_5, mode=Mode.SUBTRACT)
    with BuildSketch(Plane(origin=(0, 23, 0), x_dir=(0.6931361861639339, 0, -0.7208066505174022), z_dir=(-0.7208066505174022, 0, -0.6931361861639339))) as chamfer2_piece_6_section:
        Polygon((3.41766068, -CHAMFER2_SIZE), (3.41766068 - CHAMFER2_SIZE, 0), (3.41766068, 0), align=None)
    chamfer2_piece_6 = revolve(axis=Axis((0, 23, 0), (0, -1, 0)), revolution_arc=226.121119214, mode=Mode.PRIVATE)
    chamfer2_piece_6 = split(chamfer2_piece_6, bisect_by=Plane(origin=(0.4, 24.102417086, 1.763188451), z_dir=(-1, 0, 0)), keep=Keep.TOP, mode=Mode.PRIVATE)
    add(chamfer2_piece_6, mode=Mode.SUBTRACT)


solid = part.part
